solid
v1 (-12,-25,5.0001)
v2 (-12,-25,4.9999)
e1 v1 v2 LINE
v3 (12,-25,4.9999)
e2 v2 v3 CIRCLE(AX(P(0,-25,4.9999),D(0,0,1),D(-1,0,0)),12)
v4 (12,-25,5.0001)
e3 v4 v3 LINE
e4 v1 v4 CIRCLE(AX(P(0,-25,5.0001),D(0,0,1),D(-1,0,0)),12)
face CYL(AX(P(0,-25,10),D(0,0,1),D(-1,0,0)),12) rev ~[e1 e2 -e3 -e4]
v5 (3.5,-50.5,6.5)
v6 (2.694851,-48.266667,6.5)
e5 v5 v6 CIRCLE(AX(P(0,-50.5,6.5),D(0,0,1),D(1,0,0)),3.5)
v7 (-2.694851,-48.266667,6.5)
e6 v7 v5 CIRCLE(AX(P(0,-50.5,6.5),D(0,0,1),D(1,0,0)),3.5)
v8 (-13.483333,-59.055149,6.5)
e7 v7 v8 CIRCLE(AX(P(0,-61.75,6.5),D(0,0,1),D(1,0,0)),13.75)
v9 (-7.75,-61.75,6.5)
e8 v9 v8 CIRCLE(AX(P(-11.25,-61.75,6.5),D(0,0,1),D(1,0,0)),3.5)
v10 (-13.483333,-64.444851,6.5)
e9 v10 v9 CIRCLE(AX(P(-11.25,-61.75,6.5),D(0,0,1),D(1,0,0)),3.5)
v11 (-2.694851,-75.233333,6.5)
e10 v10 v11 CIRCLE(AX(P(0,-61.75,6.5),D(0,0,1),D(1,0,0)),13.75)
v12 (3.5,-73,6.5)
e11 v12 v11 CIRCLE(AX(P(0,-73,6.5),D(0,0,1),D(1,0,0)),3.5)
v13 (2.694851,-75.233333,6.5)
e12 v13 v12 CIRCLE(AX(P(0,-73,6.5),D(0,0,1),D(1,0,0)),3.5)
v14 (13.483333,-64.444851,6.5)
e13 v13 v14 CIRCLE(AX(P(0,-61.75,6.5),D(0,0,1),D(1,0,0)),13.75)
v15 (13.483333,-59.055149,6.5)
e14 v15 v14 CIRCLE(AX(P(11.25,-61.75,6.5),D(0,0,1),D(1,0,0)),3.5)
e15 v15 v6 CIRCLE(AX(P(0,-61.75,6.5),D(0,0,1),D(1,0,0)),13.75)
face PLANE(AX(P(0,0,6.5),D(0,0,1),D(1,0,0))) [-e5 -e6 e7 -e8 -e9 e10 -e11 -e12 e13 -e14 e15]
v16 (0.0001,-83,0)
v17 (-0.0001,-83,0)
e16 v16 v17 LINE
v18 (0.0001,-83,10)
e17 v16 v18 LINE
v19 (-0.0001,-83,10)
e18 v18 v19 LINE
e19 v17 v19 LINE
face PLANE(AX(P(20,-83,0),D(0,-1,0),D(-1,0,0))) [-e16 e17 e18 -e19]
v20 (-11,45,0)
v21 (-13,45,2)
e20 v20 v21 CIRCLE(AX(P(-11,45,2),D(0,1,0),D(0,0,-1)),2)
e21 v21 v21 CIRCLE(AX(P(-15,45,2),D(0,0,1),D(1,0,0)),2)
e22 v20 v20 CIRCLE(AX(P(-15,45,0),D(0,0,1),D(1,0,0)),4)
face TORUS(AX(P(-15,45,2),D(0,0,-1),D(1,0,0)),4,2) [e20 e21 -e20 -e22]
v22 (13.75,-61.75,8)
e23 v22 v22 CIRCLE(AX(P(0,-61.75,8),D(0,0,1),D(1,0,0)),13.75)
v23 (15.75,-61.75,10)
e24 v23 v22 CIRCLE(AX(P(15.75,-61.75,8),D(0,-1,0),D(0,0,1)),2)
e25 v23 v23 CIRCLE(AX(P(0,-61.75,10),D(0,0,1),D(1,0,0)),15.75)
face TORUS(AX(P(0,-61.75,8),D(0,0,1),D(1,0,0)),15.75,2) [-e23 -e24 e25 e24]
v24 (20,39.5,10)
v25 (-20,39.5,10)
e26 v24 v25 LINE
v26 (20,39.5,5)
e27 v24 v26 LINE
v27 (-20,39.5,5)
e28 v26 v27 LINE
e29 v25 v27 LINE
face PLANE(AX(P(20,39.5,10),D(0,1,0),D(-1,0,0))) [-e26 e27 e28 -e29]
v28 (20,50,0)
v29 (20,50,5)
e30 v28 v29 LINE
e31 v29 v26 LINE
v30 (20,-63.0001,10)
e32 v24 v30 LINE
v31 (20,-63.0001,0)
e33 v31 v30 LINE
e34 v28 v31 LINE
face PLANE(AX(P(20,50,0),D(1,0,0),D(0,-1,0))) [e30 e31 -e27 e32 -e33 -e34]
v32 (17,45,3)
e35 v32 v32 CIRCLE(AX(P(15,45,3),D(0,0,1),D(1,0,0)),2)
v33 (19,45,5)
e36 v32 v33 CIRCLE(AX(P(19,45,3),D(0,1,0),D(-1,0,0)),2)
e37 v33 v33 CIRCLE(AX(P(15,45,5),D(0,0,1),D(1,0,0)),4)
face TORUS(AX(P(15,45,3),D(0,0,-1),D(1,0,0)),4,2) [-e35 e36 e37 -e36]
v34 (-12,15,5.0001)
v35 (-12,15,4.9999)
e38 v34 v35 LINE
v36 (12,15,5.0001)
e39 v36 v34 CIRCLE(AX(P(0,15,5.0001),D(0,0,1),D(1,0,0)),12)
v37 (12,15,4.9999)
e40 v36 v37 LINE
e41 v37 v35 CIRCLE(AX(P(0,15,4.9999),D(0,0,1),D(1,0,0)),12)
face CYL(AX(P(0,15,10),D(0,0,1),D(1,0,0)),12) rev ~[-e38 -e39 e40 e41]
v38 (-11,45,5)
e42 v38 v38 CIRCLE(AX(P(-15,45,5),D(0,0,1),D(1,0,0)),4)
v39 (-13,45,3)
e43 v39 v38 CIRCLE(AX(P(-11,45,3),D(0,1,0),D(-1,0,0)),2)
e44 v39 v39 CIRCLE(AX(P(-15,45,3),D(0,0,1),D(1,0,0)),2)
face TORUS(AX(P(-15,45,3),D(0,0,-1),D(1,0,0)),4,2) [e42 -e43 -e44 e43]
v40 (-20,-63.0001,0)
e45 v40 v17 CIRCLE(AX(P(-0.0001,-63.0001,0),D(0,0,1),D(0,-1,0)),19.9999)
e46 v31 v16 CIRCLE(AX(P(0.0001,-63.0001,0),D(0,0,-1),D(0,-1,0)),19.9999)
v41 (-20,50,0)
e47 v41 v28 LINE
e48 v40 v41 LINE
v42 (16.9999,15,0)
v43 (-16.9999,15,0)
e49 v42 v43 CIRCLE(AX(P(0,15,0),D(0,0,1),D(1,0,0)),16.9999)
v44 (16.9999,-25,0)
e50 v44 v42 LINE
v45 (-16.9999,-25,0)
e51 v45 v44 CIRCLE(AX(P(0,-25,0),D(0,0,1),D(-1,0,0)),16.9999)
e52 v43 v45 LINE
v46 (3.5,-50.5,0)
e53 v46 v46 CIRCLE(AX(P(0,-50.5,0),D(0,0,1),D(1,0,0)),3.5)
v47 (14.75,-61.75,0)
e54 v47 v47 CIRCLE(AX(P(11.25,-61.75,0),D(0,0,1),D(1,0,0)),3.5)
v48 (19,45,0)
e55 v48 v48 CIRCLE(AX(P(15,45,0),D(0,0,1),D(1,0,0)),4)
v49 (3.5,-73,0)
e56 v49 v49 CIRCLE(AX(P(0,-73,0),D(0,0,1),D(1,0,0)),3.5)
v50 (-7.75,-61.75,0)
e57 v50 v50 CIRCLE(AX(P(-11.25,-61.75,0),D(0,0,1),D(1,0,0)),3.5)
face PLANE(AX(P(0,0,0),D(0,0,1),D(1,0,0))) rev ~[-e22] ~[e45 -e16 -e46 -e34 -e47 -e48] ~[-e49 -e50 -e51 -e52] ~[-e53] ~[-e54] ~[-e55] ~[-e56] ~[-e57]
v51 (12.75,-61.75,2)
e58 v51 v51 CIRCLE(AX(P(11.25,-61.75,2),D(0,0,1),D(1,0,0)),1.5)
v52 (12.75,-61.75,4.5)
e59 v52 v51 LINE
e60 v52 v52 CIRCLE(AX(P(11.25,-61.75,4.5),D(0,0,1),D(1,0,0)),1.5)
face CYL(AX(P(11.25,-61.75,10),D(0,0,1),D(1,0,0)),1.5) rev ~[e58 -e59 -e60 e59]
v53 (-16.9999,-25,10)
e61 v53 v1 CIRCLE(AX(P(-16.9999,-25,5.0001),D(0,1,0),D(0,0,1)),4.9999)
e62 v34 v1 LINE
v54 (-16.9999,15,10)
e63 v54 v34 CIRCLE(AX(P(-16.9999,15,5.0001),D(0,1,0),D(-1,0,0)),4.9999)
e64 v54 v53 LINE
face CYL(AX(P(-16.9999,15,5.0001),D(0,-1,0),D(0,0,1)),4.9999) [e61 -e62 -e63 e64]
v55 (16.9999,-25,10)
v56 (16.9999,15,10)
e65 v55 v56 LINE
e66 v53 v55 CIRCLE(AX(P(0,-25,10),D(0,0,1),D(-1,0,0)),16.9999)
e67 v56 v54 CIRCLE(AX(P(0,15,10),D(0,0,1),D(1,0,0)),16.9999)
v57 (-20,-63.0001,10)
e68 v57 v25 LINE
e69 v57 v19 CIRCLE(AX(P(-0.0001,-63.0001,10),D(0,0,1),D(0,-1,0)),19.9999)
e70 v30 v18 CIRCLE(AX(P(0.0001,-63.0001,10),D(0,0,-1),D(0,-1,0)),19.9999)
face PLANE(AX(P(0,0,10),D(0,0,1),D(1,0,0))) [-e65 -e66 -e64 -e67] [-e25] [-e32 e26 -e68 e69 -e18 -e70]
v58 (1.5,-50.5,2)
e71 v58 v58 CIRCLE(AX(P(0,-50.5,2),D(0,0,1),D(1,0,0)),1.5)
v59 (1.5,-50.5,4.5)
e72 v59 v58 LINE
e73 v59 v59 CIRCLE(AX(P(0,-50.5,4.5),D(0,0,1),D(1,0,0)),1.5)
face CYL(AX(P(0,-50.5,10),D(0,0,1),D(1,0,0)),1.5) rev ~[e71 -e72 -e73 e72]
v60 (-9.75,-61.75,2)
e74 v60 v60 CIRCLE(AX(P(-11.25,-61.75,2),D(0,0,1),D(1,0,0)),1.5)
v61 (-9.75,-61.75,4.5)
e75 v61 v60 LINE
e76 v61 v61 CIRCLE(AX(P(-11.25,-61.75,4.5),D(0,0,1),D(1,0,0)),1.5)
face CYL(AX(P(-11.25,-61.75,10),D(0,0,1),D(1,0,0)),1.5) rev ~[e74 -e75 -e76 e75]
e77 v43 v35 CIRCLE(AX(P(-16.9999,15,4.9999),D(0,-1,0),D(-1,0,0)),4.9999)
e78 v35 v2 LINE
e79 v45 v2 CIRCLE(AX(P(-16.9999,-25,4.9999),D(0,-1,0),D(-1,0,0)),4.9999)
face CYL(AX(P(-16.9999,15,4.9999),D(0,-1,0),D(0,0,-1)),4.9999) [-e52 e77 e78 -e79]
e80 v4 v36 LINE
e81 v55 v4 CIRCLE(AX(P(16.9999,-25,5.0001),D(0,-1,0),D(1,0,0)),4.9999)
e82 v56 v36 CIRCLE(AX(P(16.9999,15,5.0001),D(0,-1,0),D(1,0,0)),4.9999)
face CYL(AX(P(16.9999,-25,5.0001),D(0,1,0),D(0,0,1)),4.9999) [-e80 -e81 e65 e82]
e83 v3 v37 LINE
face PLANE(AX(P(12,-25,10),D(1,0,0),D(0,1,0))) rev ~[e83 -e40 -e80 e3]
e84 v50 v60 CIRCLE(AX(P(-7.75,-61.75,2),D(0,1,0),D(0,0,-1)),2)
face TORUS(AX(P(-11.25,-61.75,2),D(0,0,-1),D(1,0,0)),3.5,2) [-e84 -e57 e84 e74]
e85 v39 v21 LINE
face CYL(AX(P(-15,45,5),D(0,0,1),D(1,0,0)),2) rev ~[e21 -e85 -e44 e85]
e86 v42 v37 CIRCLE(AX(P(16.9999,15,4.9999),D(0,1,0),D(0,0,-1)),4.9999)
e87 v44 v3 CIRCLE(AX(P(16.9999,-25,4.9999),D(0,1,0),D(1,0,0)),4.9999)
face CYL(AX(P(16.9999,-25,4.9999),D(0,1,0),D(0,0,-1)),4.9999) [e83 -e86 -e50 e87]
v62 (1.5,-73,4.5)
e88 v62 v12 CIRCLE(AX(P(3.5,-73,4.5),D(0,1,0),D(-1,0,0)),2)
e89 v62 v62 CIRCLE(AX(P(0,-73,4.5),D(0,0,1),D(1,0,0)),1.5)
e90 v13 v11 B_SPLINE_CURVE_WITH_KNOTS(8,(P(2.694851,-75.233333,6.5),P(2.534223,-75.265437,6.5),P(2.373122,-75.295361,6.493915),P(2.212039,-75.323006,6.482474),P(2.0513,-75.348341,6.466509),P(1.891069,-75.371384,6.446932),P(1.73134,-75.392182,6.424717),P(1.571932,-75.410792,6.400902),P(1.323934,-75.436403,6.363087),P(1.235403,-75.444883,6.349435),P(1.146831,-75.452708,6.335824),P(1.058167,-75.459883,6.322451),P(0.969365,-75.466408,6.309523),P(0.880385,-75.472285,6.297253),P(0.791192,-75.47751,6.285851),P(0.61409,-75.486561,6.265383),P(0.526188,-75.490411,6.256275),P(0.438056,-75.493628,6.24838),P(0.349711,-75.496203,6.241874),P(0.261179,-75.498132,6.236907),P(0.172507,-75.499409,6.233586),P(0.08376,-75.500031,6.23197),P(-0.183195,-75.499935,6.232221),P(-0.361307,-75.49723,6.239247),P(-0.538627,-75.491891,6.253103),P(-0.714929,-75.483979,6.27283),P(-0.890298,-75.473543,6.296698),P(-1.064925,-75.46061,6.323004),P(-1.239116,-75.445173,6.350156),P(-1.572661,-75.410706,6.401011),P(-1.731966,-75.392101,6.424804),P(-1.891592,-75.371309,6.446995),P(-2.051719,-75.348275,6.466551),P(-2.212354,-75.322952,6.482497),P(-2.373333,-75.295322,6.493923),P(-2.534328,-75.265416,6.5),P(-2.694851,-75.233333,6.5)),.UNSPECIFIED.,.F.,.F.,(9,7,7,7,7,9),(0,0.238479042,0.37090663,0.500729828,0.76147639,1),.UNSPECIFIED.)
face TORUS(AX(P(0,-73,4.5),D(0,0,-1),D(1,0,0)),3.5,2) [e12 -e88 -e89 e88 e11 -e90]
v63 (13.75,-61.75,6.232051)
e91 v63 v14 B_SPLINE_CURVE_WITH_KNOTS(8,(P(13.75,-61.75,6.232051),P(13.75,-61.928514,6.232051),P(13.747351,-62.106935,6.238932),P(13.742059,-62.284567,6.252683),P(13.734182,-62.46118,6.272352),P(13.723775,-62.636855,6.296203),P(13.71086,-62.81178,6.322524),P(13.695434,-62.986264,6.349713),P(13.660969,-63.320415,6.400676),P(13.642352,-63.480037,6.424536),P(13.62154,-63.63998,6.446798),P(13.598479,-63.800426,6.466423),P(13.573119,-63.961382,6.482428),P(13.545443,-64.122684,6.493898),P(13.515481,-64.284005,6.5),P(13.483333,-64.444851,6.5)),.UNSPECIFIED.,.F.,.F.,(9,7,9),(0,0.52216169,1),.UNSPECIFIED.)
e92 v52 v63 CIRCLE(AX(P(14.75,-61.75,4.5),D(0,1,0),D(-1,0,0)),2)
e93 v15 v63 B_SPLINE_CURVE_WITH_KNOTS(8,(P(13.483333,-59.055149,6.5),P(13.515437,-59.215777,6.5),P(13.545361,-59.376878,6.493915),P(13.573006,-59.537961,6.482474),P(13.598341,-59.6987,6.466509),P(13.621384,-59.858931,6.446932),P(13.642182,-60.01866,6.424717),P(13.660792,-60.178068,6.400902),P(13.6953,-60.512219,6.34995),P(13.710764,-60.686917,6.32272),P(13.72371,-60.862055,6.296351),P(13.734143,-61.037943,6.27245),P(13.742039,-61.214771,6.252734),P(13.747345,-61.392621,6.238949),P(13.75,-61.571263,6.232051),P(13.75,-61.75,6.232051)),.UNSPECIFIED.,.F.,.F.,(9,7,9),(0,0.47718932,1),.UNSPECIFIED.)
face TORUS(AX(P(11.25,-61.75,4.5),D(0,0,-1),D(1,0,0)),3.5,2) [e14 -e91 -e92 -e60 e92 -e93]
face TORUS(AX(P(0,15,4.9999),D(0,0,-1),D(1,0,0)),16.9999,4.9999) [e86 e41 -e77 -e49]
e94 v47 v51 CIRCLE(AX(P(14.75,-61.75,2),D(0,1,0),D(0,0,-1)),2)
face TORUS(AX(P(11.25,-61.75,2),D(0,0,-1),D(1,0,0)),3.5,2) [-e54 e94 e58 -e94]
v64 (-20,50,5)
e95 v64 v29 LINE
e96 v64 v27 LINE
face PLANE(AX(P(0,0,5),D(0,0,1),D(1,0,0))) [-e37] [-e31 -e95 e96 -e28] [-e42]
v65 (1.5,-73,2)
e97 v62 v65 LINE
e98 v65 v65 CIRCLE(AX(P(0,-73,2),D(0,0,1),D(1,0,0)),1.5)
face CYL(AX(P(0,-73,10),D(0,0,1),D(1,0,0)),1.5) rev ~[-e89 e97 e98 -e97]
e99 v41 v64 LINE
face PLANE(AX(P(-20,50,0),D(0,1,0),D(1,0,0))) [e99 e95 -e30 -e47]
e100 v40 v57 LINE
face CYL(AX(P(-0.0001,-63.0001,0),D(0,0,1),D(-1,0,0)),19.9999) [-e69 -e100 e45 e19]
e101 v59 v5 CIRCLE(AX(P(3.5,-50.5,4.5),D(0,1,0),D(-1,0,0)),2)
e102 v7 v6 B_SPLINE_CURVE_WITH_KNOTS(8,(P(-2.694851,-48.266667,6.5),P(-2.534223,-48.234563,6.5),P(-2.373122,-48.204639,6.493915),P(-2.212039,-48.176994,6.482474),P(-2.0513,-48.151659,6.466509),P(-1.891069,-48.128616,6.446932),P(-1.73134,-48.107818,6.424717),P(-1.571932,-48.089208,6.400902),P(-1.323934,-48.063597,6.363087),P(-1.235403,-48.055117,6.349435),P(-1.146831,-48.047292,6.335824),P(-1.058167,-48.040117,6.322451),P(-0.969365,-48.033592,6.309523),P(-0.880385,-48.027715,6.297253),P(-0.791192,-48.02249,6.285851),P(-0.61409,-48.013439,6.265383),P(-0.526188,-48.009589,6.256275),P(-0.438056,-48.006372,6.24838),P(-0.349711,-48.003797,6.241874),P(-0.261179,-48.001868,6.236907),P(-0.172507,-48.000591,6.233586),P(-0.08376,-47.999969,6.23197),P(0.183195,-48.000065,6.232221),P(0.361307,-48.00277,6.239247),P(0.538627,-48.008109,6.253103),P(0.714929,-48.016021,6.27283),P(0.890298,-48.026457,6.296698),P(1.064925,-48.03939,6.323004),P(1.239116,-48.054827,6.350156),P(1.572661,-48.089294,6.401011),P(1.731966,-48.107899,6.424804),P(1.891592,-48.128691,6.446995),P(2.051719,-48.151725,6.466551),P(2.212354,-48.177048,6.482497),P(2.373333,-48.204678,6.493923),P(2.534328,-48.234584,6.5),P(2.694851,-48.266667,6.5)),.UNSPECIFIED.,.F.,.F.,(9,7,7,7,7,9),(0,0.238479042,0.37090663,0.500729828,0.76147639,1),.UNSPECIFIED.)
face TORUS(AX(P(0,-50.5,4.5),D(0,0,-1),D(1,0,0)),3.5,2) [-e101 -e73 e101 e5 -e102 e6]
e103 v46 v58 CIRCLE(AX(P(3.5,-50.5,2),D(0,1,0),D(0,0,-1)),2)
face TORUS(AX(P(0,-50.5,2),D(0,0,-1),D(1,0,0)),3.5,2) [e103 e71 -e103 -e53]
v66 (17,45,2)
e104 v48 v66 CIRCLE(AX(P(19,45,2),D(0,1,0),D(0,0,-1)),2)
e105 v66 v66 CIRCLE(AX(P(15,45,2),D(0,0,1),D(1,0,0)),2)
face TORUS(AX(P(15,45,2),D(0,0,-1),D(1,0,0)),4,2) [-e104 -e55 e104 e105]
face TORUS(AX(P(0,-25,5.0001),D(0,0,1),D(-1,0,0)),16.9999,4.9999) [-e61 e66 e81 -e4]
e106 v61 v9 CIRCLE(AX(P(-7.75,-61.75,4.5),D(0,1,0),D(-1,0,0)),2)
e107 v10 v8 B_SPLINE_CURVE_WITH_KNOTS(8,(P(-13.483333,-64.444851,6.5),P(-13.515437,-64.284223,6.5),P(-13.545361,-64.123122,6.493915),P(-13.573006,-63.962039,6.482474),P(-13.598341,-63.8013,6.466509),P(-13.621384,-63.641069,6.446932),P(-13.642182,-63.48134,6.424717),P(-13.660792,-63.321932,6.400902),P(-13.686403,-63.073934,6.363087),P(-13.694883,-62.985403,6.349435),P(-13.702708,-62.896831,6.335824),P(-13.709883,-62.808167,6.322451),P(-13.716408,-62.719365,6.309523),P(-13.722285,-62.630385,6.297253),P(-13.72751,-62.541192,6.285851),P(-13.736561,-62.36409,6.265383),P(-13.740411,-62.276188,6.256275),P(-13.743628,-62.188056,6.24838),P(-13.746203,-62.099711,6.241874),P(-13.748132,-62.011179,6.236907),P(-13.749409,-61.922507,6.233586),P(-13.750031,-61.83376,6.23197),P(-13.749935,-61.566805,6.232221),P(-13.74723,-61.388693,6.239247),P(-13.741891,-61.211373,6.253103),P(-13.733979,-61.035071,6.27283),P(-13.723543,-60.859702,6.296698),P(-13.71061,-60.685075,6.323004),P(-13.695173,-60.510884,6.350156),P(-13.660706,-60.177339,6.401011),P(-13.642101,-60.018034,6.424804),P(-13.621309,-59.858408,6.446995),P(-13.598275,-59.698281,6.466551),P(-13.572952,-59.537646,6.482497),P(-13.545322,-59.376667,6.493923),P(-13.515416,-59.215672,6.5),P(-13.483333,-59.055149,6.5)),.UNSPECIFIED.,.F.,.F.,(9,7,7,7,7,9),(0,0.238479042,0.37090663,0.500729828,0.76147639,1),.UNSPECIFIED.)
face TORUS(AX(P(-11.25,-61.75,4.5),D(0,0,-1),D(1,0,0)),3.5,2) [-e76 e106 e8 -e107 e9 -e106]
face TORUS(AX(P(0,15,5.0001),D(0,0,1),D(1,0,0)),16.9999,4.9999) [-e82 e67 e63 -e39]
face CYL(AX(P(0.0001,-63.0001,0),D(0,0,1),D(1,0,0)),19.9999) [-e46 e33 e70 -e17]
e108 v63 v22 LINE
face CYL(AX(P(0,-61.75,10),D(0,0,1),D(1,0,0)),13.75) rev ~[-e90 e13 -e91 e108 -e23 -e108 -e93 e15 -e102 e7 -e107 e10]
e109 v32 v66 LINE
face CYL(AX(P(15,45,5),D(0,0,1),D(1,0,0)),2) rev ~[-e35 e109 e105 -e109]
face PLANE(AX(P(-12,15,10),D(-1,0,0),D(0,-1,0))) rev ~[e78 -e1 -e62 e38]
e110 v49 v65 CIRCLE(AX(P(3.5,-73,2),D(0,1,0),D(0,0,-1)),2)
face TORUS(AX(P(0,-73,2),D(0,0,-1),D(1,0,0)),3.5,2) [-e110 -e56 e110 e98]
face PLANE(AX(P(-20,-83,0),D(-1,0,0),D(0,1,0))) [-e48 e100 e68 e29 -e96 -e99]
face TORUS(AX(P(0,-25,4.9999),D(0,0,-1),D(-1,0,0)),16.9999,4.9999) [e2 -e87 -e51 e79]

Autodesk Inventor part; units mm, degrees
ref_plane "YZ Plane" through (0, 0, 0) normal (1, 0, 0) x (0, 1, 0)
ref_plane "XZ Plane" through (0, 0, 0) normal (0, 1, 0) x (-1, 0, 0)
ref_plane "XY Plane" through (0, 0, 0) normal (0, 0, 1) x (1, 0, 0)
sketch "Sketch1" plane through (0, 0, 0) normal (0, 0, 1) x (1, 0, 0)
  line L0 (-20, 50) -> (20, 50)
  line L1 (20, 50) -> (20, -83)
  line L2 (20, -83) -> (-20, -83)
  line L3 (-20, -83) -> (-20, 50)
  point P0 (0, 0)
  dimension "d0" = 50
  dimension "d1" = 83
  dimension "d2" = 20
  dimension "d3" = 20
extrude "Extrusion1" add sketch "Sketch1" along normal blind 10
sketch "Sketch6" plane through (0, 0, 10) normal (0, 0, 1) x (1, 0, 0)
  circle A0 centre (0, -61.75) radius 13.75
  arc A1 (-18, -63) -> (18, -63) centre (0, -63) ccw projected
  line L0 (18, 20) -> (18, -83) projected
  circle A2 centre (0, -50.5) radius 1.5
  circle A3 centre (-11.25, -61.75) radius 1.5
  circle A4 centre (0, -73) radius 1.5
  circle A5 centre (11.25, -61.75) radius 1.5
  line L1 (0, 0) -> (-53.5469, 0)
  dimension "d41" = 27.5
  dimension "d42" = 5.5
  dimension "d43" = 18
  dimension "d44" = 3
  dimension "d45" = 11.25
  dimension "d46" = 18
  dimension "d49" = 360
sketch "Sketch8" plane through (0, 0, 10) normal (0, 0, 1) x (1, 0, 0)
  circle A0 centre (0, -61.75) radius 13.75
  line L0 (-18, -83) -> (-18, 20) projected
  arc A1 (-18, -63) -> (18, -63) centre (0, -63) ccw projected
  line L1 (0, 0) -> (-37.1861, 0)
  dimension "d62" = 27.5
  dimension "d63" = 18
  dimension "d64" = 1.25
extrude "Extrusion8" cut sketch "Sketch8" against normal blind 3.5
fillet "Fillet12" radius 20 2 edges at (-20, -83, 5) (20, -83, 5)
sketch "Sketch10" plane through (0, 0, 10) normal (0, 0, 1) x (1, 0, 0)
  line L0 (0, 27) -> (0, -37) construction
  line L1 (-12, 15) -> (-12, -25)
  line L2 (12, -25) -> (12, 15)
  arc A0 (12, 15) -> (-12, 15) centre (0, 15) ccw
  arc A1 (-12, -25) -> (12, -25) centre (0, -25) ccw
  line L3 (20, 50) -> (-20, 50) projected
  line L4 (20, -63) -> (20, 50) projected
  line L5 (-20, 50) -> (-20, -63) projected
  point P0 (0, 0)
  point P1 (0, -5)
  dimension "d80" = 40
  dimension "d81" = 35
  dimension "d82" = 8
  dimension "d83" = 8
extrude "Extrusion10" cut sketch "Sketch10" against normal through all
sketch "Sketch11" plane through (0, 0, 10) normal (0, 0, 1) x (1, 0, 0)
  point P0 (0, 0)
extrude "Extrusion11" cut sketch "Sketch6" against normal through all contours A2 | A3 | A4 | A5
sketch "Sketch12" plane through (0, 0, 10) normal (0, 0, 1) x (1, 0, 0)
  line L0 (-20, 50) -> (-20, -63) projected
  line L1 (20, 50) -> (20, -63) projected
  line L2 (-20, 50) -> (20, 50)
  line L3 (20, 50) -> (20, 39.5)
  line L4 (20, 39.5) -> (-20, 39.5)
  line L5 (-20, 39.5) -> (-20, 50)
  point P0 (0, 0)
  dimension "d88" = 10.5
extrude "Extrusion12" cut sketch "Sketch12" against normal blind 5
sketch "Sketch13" plane through (0, 0, 5) normal (0, 0, 1) x (1, 0, 0)
  circle A0 centre (-15, 45) radius 2
  line L0 (-20, 50) -> (20, 50) projected
  line L1 (-20, 39.5) -> (-20, 50) projected
  line L2 (0, 0) -> (0, 57.2332)
  circle A1 centre (15, 45) radius 2
  dimension "d91" = 5
  dimension "d92" = 5
  dimension "d93" = 4
extrude "Extrusion13" cut sketch "Sketch13" against normal blind 10
fillet "Fillet13" radius 5 8 edges at (0, 27, 10) (12, -5, 10) (0, -37, 10) (-12, -5, 10) (0, -37, 0) (12, -5, 0) (0, 27, 0) (-12, -5, 0)
fillet "Fillet14" radius 2 13 edges at (-17, 45, 5) (13, 45, 5) (-17, 45, 0) (13, 45, 0) (-12.75, -61.75, 0) (-1.5, -50.5, 0) (9.75, -61.75, 0) (-1.5, -73, 0) (-13.75, -61.75, 10) (-1.5, -50.5, 6.5) (-12.75, -61.75, 6.5) (9.75, -61.75, 6.5) (-1.5, -73, 6.5)
properties part number "LowerArmPartBv2"
